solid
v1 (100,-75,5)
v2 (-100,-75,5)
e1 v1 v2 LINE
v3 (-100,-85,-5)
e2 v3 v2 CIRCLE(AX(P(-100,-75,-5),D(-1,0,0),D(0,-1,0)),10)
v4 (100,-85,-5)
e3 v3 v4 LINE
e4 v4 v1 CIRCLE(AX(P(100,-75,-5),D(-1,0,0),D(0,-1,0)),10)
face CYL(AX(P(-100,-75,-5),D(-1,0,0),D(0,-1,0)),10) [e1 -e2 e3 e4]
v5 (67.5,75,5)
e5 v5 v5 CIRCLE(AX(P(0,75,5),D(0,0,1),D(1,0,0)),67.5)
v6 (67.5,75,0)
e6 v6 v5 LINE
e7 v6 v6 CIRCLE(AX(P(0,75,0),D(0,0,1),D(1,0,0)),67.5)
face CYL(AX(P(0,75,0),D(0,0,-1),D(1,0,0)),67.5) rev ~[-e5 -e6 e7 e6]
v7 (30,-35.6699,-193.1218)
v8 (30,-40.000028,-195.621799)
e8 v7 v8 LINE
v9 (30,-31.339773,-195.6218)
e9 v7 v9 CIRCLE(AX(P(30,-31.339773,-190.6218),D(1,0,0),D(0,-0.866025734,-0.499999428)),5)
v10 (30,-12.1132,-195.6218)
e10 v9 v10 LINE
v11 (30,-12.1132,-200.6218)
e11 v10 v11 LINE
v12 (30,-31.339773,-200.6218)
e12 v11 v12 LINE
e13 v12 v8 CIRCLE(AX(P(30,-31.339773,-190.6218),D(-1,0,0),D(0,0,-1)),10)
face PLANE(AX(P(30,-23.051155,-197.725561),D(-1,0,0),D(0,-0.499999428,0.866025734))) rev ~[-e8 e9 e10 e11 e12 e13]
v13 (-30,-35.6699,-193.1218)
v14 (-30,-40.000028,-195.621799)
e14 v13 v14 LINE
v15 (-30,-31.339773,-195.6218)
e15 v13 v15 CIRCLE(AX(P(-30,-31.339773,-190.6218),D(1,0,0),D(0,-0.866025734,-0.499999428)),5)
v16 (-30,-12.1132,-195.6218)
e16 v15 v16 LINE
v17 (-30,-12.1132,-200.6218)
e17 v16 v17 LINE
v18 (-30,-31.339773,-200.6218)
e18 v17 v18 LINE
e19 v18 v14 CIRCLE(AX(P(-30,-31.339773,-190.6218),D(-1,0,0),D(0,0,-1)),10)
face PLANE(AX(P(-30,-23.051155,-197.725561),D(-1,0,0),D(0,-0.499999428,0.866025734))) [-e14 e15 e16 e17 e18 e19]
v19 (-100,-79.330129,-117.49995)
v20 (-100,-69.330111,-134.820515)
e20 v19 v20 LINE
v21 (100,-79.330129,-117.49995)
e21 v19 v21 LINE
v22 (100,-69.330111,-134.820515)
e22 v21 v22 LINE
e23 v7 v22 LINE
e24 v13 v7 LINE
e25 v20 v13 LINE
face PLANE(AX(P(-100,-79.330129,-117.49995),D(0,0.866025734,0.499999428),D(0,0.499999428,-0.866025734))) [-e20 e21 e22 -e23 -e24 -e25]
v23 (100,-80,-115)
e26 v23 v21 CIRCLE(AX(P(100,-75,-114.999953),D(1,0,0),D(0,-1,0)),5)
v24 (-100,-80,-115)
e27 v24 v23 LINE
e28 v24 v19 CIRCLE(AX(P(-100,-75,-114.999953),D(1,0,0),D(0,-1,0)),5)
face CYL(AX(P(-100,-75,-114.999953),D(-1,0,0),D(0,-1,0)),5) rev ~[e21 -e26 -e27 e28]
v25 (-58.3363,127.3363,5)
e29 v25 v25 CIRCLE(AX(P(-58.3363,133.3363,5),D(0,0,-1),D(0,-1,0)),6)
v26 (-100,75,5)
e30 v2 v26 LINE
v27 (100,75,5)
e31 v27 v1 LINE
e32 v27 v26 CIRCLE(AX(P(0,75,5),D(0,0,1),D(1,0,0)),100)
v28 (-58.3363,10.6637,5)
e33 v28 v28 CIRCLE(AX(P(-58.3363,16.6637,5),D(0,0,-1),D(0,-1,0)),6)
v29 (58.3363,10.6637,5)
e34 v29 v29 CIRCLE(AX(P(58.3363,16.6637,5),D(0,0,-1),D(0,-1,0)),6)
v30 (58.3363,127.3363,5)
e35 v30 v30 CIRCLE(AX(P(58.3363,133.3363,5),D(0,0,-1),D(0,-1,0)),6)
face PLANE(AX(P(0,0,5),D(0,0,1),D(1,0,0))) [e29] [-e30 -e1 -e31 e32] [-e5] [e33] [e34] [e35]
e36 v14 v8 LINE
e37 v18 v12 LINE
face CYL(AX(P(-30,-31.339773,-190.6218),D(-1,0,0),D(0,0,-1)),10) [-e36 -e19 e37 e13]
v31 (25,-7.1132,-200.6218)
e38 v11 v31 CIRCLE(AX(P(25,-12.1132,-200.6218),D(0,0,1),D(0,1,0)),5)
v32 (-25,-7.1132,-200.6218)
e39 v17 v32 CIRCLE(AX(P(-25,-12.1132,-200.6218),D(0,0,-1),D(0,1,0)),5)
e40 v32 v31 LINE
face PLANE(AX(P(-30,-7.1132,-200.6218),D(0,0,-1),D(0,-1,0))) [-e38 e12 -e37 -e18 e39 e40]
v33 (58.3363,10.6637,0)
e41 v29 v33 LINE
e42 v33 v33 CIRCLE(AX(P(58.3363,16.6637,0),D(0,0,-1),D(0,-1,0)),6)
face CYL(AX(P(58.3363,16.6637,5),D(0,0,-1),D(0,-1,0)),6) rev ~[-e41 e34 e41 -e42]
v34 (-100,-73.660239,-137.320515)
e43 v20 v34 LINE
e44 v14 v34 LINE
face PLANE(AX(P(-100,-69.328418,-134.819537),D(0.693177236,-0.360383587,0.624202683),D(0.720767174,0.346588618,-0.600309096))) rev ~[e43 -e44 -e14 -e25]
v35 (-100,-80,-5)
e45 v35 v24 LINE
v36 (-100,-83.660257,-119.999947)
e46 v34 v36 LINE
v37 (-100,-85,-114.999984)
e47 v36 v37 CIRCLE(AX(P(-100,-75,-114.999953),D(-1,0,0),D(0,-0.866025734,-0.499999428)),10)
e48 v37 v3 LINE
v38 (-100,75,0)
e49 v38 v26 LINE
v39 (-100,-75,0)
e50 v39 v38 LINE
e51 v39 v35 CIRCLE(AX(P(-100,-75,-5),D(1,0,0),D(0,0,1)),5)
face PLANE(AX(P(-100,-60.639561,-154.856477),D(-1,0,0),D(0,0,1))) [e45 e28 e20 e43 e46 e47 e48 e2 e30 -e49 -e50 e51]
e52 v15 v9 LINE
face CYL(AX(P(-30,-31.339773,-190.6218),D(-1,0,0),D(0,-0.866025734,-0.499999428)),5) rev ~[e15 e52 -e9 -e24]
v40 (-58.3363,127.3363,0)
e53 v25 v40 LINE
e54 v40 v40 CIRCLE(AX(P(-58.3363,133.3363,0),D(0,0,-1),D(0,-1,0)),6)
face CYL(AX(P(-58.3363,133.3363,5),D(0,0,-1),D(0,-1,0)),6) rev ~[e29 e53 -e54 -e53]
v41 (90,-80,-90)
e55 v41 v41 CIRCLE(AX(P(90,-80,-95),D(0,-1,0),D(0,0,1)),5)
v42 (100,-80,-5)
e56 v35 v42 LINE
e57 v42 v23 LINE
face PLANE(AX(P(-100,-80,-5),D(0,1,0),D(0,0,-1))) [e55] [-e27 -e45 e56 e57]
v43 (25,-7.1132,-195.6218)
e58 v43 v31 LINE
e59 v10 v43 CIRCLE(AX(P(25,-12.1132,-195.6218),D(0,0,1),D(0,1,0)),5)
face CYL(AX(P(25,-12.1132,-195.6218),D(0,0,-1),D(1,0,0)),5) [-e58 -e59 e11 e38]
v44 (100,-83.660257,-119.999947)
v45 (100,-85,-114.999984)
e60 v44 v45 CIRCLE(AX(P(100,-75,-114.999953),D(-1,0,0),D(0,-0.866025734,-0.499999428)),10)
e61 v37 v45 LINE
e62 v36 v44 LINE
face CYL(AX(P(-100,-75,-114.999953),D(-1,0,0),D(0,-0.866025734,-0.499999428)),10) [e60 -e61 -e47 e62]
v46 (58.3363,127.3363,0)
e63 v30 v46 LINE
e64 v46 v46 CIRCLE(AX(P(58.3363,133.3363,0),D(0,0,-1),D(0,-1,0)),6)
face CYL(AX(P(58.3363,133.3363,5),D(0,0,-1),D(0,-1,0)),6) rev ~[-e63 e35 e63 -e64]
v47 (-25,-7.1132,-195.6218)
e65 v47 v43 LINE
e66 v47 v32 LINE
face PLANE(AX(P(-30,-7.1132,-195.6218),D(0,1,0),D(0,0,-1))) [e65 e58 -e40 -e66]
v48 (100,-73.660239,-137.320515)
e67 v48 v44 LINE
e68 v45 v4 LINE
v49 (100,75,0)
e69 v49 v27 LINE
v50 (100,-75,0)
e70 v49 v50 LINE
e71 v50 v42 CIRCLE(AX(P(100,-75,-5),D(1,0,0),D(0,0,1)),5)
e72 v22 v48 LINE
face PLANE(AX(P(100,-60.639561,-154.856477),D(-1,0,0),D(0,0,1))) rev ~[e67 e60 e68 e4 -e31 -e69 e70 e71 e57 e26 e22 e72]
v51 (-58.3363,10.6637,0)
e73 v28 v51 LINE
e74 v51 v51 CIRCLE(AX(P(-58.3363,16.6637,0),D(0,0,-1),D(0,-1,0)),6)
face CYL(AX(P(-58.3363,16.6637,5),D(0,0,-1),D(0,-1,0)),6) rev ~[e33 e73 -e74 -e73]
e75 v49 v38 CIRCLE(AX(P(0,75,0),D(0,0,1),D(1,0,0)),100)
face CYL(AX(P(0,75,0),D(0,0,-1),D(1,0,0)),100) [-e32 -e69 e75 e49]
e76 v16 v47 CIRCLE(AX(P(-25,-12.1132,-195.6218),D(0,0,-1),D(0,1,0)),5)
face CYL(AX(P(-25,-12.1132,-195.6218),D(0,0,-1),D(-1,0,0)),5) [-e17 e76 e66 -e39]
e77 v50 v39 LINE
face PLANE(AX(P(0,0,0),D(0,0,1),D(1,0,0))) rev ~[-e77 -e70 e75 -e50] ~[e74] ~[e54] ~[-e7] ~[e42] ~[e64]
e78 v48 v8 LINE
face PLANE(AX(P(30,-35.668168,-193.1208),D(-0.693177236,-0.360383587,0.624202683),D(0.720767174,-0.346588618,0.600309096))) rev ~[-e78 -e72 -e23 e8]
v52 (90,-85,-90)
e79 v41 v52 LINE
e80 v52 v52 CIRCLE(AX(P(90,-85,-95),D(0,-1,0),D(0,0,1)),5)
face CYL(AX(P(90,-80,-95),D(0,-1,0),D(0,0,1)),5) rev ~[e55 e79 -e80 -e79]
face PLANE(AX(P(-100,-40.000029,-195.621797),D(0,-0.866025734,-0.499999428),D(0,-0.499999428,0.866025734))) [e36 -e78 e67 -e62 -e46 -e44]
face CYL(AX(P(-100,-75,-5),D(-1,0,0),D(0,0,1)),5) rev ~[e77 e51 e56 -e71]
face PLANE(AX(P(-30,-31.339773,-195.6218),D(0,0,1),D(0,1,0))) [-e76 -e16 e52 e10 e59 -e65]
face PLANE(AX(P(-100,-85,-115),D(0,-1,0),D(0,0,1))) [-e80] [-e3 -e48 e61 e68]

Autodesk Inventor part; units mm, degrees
ref_plane "YZ Plane" through (0, 0, 0) normal (1, 0, 0) x (0, 1, 0)
ref_plane "XZ Plane" through (0, 0, 0) normal (0, 1, 0) x (-1, 0, 0)
ref_plane "XY Plane" through (0, 0, 0) normal (0, 0, 1) x (1, 0, 0)
sketch "Schizzo1" plane through (0, 0, 0) normal (0, 0, 1) x (1, 0, 0)
  line L0 (100, 75) -> (100, -75)
  line L1 (100, -75) -> (-100, -75)
  line L2 (-100, -75) -> (-100, 75)
  line L3 (-100, 75) -> (100, -75) construction
  line L4 (100, 75) -> (-100, -75) construction
  arc A0 (100, 75) -> (-100, 75) centre (0, 75) ccw
  circle A1 centre (0, 75) radius 67.5
  point P0 (0, 0)
  point P1 (0, 0)
  dimension "d0" = 200
  dimension "d1" = 150
  dimension "d3" = 100
  dimension "d4" = 135
extrude "Piano2" add sketch "Schizzo1" along normal blind 5
sketch "Schizzo2" plane through (-100, -80, -5) normal (0, -1, 0) x (1, 0, 0)
  line L0 (200, 0) -> (0, 0)
  line L1 (0, 0) -> (0, -110)
  line L2 (0, -110) -> (200, -110)
  line L3 (200, -110) -> (200, 0)
edge flange "Flangia1" height 120 angle 90 thickness 5 bend radius 5 thickness toward (0, -1, 0) relief tear relief width 5 relief depth 2.5 edges at (0, -75, 0) wall of the first edge with corners at (100, -80, -5) (-100, -80, -5) (-100, -80, -115) (100, -80, -115)
bend "Piega (Bend)1"
corner "Angolo1"
sketch "Schizzo3" plane through (-100, -79.3301, -117.5) normal (0, -0.8660254, -0.5) x (1, 0, 0)
  line L0 (200, 0) -> (0, 0)
  line L1 (0, 0) -> (0, -87.3205)
  line L2 (0, -87.3205) -> (200, -87.3205)
  line L3 (200, -87.3205) -> (200, 0)
edge flange "Flangia2" height 90 angle 30 thickness 5 bend radius 5 thickness toward (0, -0.8660254, -0.5) relief tear relief width 5 relief depth 2.5 edges at (0, -80, -115) wall of the first edge with corners at (100, -79.3301, -117.5) (-100, -79.3301, -117.5) (-100, -35.6699, -193.1218) (100, -35.6699, -193.1218)
bend "Piega (Bend)2"
corner "Angolo2"
sketch "Schizzo5" plane through (0, 0, 5) normal (0, 0, 1) x (1, 0, 0)
  circle A0 centre (58.3363, 133.3363) radius 6 projected
  circle A1 centre (-58.3363, 133.3363) radius 6 projected
  circle A2 centre (-58.3363, 16.6637) radius 6 projected
  circle A3 centre (58.3363, 16.6637) radius 6 projected
  point P0 (0, 0)
hole "Foro1" at (-58.3363, 133.3363, 5) at (58.3363, 133.3363, 5) at (58.3363, 16.6637, 5) at (-58.3363, 16.6637, 5) direction (0, 0, -1) diameter 12 end through all
sketch "Schizzo6" plane through (-100, -35.6699, -193.1218) normal (0, 0.8660254, 0.5) x (1, 0, 0)
  line L0 (200, 0) -> (0, 0) projected
  line L1 (100, 0) -> (130, 0)
  line L2 (130, 0) -> (200, -67.3205)
  line L3 (100, 0) -> (70, 0)
  line L4 (0, 0) -> (0, -87.3205) projected
  line L5 (0, -67.3205) -> (70, 0)
  line L6 (200, -67.3205) -> (200, 19.9941)
  line L7 (200, 19.9941) -> (0, 19.9941)
  line L8 (0, 19.9941) -> (0, -67.3205)
  point P0 (100, -149.4134)
  point P1 (200, -87.3205)
  dimension "d43" = 20
  dimension "d44" = 30
  dimension "d45" = 30
  dimension "d46" = 20
extrude "Taglia1" cut sketch "Schizzo6" against normal blind 5
sketch "Schizzo7" plane through (-30, -31.3397, -195.6218) normal (0, 0, -1) x (-1, 0, 0)
  line L0 (-60, 0) -> (0, 0)
  line L1 (0, 0) -> (0, 24.2265)
  line L2 (0, 24.2265) -> (-60, 24.2265)
  line L3 (-60, 24.2265) -> (-60, 0)
edge flange "Flangia4" height 30 angle 60 thickness 5 bend radius 5 thickness toward (0, 0, -1) relief tear relief width 5 relief depth 2.5 edges at (0, -35.6699, -193.1218) wall of the first edge with corners at (30, -31.3397, -195.6218) (-30, -31.3397, -195.6218) (-30, -7.1132, -195.6218) (30, -7.1132, -195.6218)
bend "Piega (Bend)4"
corner "Angolo4"
fillet "Arrotondamento angolo1" radius 5 2 edges at (30, -7.1132, -198.1218) (-30, -7.1132, -198.1218)
sketch "Schizzo8" plane through (-100, -80, -5) normal (0, 1, 0) x (1, 0, 0)
  circle A0 centre (190, 90) radius 2.5 projected
  point P0 (100, -5)
hole "Foro2" at (90, -80, -95) direction (0, -1, 0) diameter 10 end through all
equation "\"d41\" = Spessore"
equation "\"d47\" = Spessore"
equation "\"d65\" = Spessore"
equation "\"d5\" = Spessore"
equation "\"d6\" = LarghezzaScaricoPiega"
equation "\"d7\" = ProfonditàScaricoPiega"
equation "\"d8\" = ResiduoMinimo"
equation "\"d9\" = RaggioTransizione"
equation "\"d12\" = RaggioPiega"
equation "\"d13\" = DimensioniScaricoAngolo"
equation "\"d14\" = DimensioneGioco"
equation "\"d15\" = Dimensione_raggio_Jacobi"
equation "\"d16\" = LarghezzaScaricoPiega"
equation "\"d17\" = ProfonditàScaricoPiega"
equation "\"d18\" = ResiduoMinimo"
equation "\"d19\" = RaggioTransizione"
equation "\"d22\" = RaggioPiega"
equation "\"d23\" = DimensioniScaricoAngolo"
equation "\"d24\" = DimensioneGioco"
equation "\"d25\" = Dimensione_raggio_Jacobi"
equation "\"d49\" = LarghezzaScaricoPiega"
equation "\"d50\" = ProfonditàScaricoPiega"
equation "\"d51\" = ResiduoMinimo"
equation "\"d52\" = RaggioTransizione"
equation "\"d55\" = RaggioPiega"
equation "\"d56\" = DimensioniScaricoAngolo"
equation "\"d57\" = DimensioneGioco"
equation "\"d58\" = Dimensione_raggio_Jacobi"
equation "\"RaggioPiega\" = Spessore"
equation "\"LarghezzaScaricoPiega\" = Spessore"
equation "\"ProfonditàScaricoPiega\" = 0.5 * Spessore"
equation "\"RaggioTransizione\" = RaggioPiega"
equation "\"Dimensione_raggio_Jacobi\" = RaggioPiega"
equation "\"DimensioneGioco\" = Spessore"
equation "\"Spessore\" = 5"
equation "\"ResiduoMinimo\" = 10"
equation "\"DimensioniScaricoAngolo\" = 20"
properties part number "Lamiera supporto motore" material "Acciaio inossidabile"
